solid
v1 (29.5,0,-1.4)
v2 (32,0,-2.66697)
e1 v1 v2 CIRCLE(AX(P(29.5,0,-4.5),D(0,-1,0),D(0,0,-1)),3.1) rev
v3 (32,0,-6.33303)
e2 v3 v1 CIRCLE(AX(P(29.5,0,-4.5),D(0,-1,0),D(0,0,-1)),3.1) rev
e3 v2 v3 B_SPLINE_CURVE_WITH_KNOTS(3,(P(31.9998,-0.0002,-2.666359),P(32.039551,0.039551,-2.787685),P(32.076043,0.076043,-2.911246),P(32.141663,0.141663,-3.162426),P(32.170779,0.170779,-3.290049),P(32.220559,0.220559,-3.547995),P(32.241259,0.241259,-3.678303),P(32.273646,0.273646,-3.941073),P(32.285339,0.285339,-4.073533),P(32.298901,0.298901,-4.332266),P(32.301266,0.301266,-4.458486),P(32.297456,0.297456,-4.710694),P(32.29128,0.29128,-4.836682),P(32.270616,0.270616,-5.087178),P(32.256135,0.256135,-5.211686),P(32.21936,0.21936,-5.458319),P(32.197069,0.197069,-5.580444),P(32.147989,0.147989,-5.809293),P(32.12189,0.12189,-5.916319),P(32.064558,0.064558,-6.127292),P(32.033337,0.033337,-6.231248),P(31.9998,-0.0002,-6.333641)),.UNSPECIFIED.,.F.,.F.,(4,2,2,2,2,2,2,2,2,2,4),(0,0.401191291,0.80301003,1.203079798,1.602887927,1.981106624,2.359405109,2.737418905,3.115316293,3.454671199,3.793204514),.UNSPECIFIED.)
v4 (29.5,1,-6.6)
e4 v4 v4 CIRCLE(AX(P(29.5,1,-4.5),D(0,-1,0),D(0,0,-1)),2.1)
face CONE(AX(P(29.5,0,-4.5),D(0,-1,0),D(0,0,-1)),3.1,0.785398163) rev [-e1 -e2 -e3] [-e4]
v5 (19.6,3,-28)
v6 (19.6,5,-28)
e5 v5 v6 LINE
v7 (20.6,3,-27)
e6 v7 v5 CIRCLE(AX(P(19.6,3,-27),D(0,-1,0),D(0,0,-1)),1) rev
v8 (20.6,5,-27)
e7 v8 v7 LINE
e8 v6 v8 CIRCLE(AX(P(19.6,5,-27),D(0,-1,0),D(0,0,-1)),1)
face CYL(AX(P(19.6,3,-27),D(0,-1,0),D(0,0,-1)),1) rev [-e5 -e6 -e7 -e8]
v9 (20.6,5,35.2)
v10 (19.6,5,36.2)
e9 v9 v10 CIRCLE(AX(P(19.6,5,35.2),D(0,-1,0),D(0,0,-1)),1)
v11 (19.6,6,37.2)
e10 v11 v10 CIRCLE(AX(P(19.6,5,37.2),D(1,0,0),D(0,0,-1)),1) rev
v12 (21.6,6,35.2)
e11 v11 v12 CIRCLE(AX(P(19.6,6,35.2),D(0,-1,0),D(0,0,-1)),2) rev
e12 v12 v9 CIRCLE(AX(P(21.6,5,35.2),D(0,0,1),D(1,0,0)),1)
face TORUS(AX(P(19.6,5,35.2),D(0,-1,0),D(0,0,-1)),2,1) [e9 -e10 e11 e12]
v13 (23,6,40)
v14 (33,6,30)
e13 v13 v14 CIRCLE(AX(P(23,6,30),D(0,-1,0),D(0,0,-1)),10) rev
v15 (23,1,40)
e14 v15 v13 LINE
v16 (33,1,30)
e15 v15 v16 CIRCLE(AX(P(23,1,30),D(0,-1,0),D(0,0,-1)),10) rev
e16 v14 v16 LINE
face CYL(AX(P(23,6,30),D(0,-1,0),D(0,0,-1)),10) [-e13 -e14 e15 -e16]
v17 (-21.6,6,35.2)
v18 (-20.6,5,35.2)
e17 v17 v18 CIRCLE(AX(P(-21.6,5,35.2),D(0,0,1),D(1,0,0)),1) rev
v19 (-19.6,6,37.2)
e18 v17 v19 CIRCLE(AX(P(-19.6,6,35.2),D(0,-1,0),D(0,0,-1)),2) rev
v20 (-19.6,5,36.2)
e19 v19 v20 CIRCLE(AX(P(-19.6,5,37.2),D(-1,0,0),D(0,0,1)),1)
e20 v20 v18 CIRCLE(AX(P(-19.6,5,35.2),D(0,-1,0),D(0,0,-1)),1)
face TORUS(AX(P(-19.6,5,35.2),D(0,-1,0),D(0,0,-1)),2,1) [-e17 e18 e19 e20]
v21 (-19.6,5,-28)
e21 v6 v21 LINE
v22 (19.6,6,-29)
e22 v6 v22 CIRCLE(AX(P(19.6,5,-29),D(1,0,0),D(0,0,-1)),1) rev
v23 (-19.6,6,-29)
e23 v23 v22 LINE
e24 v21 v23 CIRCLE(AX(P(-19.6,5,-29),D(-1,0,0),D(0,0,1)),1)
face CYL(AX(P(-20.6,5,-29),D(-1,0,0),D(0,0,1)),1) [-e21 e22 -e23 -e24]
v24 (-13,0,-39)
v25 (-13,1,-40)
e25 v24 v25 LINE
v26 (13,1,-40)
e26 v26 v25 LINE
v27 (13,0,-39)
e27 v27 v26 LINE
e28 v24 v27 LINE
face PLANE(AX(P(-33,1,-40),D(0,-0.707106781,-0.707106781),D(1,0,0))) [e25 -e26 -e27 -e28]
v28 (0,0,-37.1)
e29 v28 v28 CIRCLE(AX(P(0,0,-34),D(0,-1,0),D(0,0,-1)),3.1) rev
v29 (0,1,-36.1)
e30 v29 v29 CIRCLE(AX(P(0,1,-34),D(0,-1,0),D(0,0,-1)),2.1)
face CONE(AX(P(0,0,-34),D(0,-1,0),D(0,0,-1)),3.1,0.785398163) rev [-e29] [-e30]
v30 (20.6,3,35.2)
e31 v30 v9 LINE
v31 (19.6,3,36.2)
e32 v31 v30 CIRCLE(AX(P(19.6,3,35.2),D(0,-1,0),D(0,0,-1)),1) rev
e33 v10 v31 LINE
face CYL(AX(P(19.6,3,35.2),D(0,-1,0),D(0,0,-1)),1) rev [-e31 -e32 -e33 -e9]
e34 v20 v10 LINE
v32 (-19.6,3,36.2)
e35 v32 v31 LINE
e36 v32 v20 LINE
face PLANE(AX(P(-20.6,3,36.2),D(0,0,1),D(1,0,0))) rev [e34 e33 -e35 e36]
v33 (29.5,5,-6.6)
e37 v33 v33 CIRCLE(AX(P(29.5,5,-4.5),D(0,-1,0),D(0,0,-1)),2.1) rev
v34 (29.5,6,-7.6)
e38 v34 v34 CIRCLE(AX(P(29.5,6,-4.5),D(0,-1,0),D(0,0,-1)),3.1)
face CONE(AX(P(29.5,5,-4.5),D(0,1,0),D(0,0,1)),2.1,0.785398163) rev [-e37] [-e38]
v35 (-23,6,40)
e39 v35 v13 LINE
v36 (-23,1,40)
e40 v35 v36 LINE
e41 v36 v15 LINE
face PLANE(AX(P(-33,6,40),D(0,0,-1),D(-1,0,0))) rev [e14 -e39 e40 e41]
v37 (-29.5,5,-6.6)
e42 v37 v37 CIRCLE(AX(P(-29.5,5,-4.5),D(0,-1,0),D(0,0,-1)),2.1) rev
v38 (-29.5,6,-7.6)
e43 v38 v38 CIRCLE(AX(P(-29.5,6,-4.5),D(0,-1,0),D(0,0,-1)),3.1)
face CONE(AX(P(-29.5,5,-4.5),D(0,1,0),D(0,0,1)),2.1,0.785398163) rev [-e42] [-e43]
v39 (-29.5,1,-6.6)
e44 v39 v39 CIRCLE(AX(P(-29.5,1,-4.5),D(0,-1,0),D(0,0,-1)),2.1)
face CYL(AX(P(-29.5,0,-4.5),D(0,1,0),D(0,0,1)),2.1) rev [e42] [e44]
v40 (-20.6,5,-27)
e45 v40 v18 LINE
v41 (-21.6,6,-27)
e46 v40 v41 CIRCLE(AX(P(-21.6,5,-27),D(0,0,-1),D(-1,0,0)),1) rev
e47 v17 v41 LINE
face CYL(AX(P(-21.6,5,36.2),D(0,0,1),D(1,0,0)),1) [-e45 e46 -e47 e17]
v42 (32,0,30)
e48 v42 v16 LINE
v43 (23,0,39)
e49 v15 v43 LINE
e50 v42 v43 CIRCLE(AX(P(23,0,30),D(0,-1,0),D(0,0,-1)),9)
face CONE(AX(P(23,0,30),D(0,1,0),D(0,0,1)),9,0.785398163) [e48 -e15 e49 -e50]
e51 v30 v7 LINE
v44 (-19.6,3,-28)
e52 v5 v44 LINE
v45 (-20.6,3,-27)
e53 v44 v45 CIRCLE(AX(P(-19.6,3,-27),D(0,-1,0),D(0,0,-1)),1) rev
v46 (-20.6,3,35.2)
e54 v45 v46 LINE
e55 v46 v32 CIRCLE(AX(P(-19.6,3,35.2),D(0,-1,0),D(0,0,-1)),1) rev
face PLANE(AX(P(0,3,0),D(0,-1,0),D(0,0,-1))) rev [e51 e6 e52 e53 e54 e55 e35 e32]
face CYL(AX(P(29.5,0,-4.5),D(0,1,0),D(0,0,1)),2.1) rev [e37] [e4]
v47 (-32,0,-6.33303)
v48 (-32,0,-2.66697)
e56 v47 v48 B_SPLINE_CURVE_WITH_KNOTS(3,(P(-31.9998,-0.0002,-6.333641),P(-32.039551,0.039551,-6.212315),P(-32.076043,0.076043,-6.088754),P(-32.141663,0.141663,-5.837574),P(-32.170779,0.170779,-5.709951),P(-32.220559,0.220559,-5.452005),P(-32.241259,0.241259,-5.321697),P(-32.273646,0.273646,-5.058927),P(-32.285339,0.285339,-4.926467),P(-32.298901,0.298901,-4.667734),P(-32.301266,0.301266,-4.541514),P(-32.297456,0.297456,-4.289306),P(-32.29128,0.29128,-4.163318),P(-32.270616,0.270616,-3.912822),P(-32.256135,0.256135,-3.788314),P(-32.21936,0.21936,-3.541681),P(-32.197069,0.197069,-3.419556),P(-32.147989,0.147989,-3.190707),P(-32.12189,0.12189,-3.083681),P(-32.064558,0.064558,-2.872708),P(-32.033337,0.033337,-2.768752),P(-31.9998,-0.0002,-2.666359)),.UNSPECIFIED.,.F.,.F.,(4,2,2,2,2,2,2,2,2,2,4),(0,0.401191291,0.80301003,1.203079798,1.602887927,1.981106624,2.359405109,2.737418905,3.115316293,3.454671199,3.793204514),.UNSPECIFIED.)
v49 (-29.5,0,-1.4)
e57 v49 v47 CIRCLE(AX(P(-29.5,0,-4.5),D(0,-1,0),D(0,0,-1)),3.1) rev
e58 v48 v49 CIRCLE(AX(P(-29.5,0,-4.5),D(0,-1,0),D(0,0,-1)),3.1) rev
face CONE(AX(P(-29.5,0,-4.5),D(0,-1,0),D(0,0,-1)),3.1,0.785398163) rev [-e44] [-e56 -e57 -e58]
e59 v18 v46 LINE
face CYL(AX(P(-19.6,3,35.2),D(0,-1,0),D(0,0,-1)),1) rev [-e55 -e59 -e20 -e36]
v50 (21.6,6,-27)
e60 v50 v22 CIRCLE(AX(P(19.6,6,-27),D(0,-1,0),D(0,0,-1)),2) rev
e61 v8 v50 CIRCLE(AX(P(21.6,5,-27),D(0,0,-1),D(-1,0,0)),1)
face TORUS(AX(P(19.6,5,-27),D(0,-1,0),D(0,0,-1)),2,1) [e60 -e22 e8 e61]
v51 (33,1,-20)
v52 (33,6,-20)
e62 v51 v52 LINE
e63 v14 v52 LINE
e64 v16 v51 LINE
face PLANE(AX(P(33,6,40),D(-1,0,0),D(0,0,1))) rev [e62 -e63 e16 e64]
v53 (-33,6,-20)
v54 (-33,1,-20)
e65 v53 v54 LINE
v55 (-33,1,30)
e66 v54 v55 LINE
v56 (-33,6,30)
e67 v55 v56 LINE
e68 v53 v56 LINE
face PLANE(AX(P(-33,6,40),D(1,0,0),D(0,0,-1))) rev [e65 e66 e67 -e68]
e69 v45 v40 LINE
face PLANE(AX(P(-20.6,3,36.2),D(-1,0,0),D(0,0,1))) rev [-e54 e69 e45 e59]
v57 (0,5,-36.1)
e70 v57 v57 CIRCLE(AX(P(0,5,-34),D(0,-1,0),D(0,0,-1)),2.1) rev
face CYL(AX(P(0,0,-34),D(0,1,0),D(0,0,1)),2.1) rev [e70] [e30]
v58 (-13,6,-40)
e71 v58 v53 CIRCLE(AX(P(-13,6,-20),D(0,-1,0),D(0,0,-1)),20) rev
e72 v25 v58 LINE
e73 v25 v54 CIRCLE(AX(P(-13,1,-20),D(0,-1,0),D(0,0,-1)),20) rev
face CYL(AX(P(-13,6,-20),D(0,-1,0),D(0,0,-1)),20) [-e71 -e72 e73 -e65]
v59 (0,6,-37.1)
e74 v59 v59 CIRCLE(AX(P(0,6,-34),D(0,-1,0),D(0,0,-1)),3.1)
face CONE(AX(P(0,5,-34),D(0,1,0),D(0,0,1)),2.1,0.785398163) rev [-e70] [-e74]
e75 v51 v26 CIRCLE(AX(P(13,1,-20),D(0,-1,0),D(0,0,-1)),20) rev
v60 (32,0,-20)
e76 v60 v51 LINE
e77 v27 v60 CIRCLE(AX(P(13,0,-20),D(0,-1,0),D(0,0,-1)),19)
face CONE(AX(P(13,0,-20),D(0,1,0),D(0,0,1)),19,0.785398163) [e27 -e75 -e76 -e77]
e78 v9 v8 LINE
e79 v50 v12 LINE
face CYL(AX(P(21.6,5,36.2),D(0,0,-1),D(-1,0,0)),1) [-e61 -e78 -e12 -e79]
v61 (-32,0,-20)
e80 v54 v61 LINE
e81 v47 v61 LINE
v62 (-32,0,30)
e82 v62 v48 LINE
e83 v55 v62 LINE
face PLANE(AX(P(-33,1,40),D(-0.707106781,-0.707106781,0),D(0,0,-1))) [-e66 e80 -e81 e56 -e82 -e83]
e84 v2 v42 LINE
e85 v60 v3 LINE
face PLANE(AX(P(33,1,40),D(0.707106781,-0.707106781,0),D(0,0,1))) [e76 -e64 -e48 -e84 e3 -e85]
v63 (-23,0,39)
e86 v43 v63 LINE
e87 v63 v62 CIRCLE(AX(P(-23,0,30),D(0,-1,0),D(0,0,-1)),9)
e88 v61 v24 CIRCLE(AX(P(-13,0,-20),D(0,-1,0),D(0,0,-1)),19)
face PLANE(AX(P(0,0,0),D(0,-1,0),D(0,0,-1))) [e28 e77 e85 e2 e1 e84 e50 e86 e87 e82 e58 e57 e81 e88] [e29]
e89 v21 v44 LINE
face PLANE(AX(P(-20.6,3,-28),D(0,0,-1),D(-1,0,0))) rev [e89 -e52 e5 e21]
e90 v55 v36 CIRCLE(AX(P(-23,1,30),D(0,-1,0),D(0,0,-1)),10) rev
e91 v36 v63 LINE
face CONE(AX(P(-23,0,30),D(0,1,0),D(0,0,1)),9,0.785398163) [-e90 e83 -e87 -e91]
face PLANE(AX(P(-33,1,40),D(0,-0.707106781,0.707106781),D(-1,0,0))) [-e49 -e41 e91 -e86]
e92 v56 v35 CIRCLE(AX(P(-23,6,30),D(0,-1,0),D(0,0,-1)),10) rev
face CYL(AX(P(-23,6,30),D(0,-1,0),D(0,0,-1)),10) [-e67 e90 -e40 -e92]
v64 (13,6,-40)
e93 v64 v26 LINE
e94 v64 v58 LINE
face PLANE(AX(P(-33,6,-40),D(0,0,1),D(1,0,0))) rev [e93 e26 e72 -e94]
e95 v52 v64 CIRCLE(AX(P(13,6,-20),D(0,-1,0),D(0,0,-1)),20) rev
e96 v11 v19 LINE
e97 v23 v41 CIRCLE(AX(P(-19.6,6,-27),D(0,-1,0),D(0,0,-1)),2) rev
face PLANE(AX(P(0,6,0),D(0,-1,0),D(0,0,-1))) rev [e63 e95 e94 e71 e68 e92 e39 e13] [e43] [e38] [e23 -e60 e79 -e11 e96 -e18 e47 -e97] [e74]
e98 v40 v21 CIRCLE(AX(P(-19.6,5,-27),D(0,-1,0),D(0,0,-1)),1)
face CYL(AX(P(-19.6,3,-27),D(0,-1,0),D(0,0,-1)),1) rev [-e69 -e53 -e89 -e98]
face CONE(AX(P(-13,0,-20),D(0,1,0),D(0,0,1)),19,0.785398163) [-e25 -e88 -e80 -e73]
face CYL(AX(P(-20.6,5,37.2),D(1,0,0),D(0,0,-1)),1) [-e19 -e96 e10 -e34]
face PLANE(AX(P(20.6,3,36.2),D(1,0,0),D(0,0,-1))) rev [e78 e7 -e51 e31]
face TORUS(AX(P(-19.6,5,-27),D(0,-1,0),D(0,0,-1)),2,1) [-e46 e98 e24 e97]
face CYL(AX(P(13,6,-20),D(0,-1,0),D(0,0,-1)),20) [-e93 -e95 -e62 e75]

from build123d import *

# Parameters (mm, degrees)
SKETCH_1_W          = 66
SKETCH_1_H          = 80
EXTRUDE_1_DEPTH     = 6
SKETCH_2_W          = 41.2
SKETCH_2_H          = 64.2
CUT_EXTRUDE_1_DEPTH = 3
FILLET_1_R          = 1
SKETCH_3_R          = 2.1
CUT_EXTRUDE_2_DEPTH = 53.201532545
CHAMFER_1_SIZE      = 1
FILLET_2_R          = 20
FILLET_3_R          = 10
CHAMFER_2_SIZE      = 1


with BuildPart() as part:
    # Эскиз1 → Бобышка-Вытянуть1 (new body)
    with BuildSketch(Plane(origin=(0, 0, 0), x_dir=(1, 0, 0), z_dir=(0, 1, 0))):
        Rectangle(SKETCH_1_W, SKETCH_1_H)
    extrude(amount=EXTRUDE_1_DEPTH)

    # Эскиз2 → Вырез-Вытянуть1 (cut)
    with BuildSketch(Plane(origin=(0, 6, 0), x_dir=(1, 0, 0), z_dir=(0, 1, 0))):
        with Locations((0, -4.1)):
            Rectangle(SKETCH_2_W, SKETCH_2_H)
    extrude(amount=-CUT_EXTRUDE_1_DEPTH, mode=Mode.SUBTRACT)

    # Скругление1
    fillet_1_edges = [part.edges().sort_by_distance(p)[0] for p in [
        (20.6, 4.5, -28),
        (20.6, 4.5, 36.2),
        (-20.6, 4.5, 36.2),
        (-20.6, 4.5, -28),
        (20.6, 6, 4.1),
        (0, 6, -28),
        (-20.6, 6, 4.1),
        (0, 6, 36.2),
    ]]
    fillet(fillet_1_edges, radius=FILLET_1_R)

    # Эскиз3 → Вырез-Вытянуть2 (cut, through all)
    with BuildSketch(Plane(origin=(0, 6, 0), x_dir=(1, 0, 0), z_dir=(0, 1, 0))):
        with Locations(Location((0, 34, 0), (0, 0, 270))):
            Circle(SKETCH_3_R)
        with Locations(Location((-29.5, 4.5, 0), (0, 0, 270))):
            Circle(SKETCH_3_R)
        with Locations(Location((29.5, 4.5, 0), (0, 0, 270))):
            Circle(SKETCH_3_R)
    extrude(amount=-CUT_EXTRUDE_2_DEPTH, mode=Mode.SUBTRACT)

    # Фаска1
    chamfer_1_edges = [part.edges().sort_by_distance(p)[0] for p in [
        (0, 6, -36.1),
        (-29.5, 6, -6.6),
        (29.5, 6, -6.6),
    ]]
    chamfer(chamfer_1_edges, length=CHAMFER_1_SIZE)

    # Скругление2
    fillet_2_edges = [part.edges().sort_by_distance(p)[0] for p in [
        (-33, 3, -40),
        (33, 3, -40),
    ]]
    fillet(fillet_2_edges, radius=FILLET_2_R)

    # Скругление3
    fillet_3_edges = [part.edges().sort_by_distance(p)[0] for p in [
        (33, 3, 40),
        (-33, 3, 40),
    ]]
    fillet(fillet_3_edges, radius=FILLET_3_R)

    # Фаска2
    # the kernel refuses this chamfer: 1 mm, written as the material it takes off along each edge
    with BuildSketch(Plane(origin=(-23, 0, 30), x_dir=(-1, 0, 0), z_dir=(0, 0, -1))) as chamfer_2_piece_1:
        Polygon((10, CHAMFER_2_SIZE), (10 - CHAMFER_2_SIZE, 0), (10, 0), align=None)
    revolve(axis=Axis((-23, 0, 30), (0, 1, 0)), revolution_arc=90, mode=Mode.SUBTRACT)
    with BuildSketch(Plane(origin=(0, 0, -34), x_dir=(0, 0, 1), z_dir=(-1, 0, 0))) as chamfer_2_piece_2:
        Polygon((2.1 + CHAMFER_2_SIZE, 0), (2.1, CHAMFER_2_SIZE), (2.1, 0), align=None)
    revolve(axis=Axis((0, 0, -34), (0, 1, 0)), mode=Mode.SUBTRACT)
    with BuildSketch(Plane(origin=(-29.5, 0, -4.5), x_dir=(0, 0, 1), z_dir=(-1, 0, 0))) as chamfer_2_piece_3:
        Polygon((2.1 + CHAMFER_2_SIZE, 0), (2.1, CHAMFER_2_SIZE), (2.1, 0), align=None)
    revolve(axis=Axis((-29.5, 0, -4.5), (0, 1, 0)), mode=Mode.SUBTRACT)
    with BuildSketch(Plane(origin=(29.5, 0, -4.5), x_dir=(0, 0, 1), z_dir=(-1, 0, 0))) as chamfer_2_piece_4:
        Polygon((2.1 + CHAMFER_2_SIZE, 0), (2.1, CHAMFER_2_SIZE), (2.1, 0), align=None)
    revolve(axis=Axis((29.5, 0, -4.5), (0, 1, 0)), mode=Mode.SUBTRACT)
    with BuildSketch(Plane(origin=(-33, 0, -20), x_dir=(-0.02749587661058908, 0.9996219169112968, 0), z_dir=(0, 0, 1)), Plane(origin=(33, 0, 30), x_dir=(0.02749587661058908, 0.9996219169112968, 0), z_dir=(0, 0, -1))) as chamfer_2_piece_5:
        Polygon((CHAMFER_2_SIZE * 0.999621916911, -CHAMFER_2_SIZE * 0.0274958766106), (-CHAMFER_2_SIZE * 0.0274958766106, -CHAMFER_2_SIZE * 0.999621916911), (0, 0), align=None)
    extrude(amount=50, mode=Mode.SUBTRACT)
    with BuildSketch(Plane(origin=(13, 0, -40), x_dir=(0, 0.9996219169112968, -0.02749587661058908), z_dir=(-1, 0, 0))) as chamfer_2_piece_6:
        Polygon((CHAMFER_2_SIZE * 0.999621916911, -CHAMFER_2_SIZE * 0.0274958766106), (-CHAMFER_2_SIZE * 0.0274958766106, -CHAMFER_2_SIZE * 0.999621916911), (0, 0), align=None)
    extrude(amount=26, mode=Mode.SUBTRACT)
    with BuildSketch(Plane(origin=(13, 0, -20), x_dir=(1, 0, 0), z_dir=(0, 0, 1))) as chamfer_2_piece_7:
        Polygon((20, CHAMFER_2_SIZE), (20 - CHAMFER_2_SIZE, 0), (20, 0), align=None)
    revolve(axis=Axis((13, 0, -20), (0, 1, 0)), revolution_arc=90, mode=Mode.SUBTRACT)
    with BuildSketch(Plane(origin=(-13, 0, -20), x_dir=(-1, 0, 0), z_dir=(0, 0, 1))) as chamfer_2_piece_8:
        Polygon((20, -CHAMFER_2_SIZE), (20 - CHAMFER_2_SIZE, 0), (20, 0), align=None)
    revolve(axis=Axis((-13, 0, -20), (0, -1, 0)), revolution_arc=90, mode=Mode.SUBTRACT)
    with BuildSketch(Plane(origin=(-23, 0, 40), x_dir=(0, 0.9996219169112968, 0.02749587661058908), z_dir=(1, 0, 0))) as chamfer_2_piece_9:
        Polygon((CHAMFER_2_SIZE * 0.999621916911, -CHAMFER_2_SIZE * 0.0274958766106), (-CHAMFER_2_SIZE * 0.0274958766106, -CHAMFER_2_SIZE * 0.999621916911), (0, 0), align=None)
    extrude(amount=46, mode=Mode.SUBTRACT)
    with BuildSketch(Plane(origin=(23, 0, 30), x_dir=(0, 0, 1), z_dir=(-1, 0, 0))) as chamfer_2_piece_10:
        Polygon((10, CHAMFER_2_SIZE), (10 - CHAMFER_2_SIZE, 0), (10, 0), align=None)
    revolve(axis=Axis((23, 0, 30), (0, 1, 0)), revolution_arc=90, mode=Mode.SUBTRACT)


solid = part.part
